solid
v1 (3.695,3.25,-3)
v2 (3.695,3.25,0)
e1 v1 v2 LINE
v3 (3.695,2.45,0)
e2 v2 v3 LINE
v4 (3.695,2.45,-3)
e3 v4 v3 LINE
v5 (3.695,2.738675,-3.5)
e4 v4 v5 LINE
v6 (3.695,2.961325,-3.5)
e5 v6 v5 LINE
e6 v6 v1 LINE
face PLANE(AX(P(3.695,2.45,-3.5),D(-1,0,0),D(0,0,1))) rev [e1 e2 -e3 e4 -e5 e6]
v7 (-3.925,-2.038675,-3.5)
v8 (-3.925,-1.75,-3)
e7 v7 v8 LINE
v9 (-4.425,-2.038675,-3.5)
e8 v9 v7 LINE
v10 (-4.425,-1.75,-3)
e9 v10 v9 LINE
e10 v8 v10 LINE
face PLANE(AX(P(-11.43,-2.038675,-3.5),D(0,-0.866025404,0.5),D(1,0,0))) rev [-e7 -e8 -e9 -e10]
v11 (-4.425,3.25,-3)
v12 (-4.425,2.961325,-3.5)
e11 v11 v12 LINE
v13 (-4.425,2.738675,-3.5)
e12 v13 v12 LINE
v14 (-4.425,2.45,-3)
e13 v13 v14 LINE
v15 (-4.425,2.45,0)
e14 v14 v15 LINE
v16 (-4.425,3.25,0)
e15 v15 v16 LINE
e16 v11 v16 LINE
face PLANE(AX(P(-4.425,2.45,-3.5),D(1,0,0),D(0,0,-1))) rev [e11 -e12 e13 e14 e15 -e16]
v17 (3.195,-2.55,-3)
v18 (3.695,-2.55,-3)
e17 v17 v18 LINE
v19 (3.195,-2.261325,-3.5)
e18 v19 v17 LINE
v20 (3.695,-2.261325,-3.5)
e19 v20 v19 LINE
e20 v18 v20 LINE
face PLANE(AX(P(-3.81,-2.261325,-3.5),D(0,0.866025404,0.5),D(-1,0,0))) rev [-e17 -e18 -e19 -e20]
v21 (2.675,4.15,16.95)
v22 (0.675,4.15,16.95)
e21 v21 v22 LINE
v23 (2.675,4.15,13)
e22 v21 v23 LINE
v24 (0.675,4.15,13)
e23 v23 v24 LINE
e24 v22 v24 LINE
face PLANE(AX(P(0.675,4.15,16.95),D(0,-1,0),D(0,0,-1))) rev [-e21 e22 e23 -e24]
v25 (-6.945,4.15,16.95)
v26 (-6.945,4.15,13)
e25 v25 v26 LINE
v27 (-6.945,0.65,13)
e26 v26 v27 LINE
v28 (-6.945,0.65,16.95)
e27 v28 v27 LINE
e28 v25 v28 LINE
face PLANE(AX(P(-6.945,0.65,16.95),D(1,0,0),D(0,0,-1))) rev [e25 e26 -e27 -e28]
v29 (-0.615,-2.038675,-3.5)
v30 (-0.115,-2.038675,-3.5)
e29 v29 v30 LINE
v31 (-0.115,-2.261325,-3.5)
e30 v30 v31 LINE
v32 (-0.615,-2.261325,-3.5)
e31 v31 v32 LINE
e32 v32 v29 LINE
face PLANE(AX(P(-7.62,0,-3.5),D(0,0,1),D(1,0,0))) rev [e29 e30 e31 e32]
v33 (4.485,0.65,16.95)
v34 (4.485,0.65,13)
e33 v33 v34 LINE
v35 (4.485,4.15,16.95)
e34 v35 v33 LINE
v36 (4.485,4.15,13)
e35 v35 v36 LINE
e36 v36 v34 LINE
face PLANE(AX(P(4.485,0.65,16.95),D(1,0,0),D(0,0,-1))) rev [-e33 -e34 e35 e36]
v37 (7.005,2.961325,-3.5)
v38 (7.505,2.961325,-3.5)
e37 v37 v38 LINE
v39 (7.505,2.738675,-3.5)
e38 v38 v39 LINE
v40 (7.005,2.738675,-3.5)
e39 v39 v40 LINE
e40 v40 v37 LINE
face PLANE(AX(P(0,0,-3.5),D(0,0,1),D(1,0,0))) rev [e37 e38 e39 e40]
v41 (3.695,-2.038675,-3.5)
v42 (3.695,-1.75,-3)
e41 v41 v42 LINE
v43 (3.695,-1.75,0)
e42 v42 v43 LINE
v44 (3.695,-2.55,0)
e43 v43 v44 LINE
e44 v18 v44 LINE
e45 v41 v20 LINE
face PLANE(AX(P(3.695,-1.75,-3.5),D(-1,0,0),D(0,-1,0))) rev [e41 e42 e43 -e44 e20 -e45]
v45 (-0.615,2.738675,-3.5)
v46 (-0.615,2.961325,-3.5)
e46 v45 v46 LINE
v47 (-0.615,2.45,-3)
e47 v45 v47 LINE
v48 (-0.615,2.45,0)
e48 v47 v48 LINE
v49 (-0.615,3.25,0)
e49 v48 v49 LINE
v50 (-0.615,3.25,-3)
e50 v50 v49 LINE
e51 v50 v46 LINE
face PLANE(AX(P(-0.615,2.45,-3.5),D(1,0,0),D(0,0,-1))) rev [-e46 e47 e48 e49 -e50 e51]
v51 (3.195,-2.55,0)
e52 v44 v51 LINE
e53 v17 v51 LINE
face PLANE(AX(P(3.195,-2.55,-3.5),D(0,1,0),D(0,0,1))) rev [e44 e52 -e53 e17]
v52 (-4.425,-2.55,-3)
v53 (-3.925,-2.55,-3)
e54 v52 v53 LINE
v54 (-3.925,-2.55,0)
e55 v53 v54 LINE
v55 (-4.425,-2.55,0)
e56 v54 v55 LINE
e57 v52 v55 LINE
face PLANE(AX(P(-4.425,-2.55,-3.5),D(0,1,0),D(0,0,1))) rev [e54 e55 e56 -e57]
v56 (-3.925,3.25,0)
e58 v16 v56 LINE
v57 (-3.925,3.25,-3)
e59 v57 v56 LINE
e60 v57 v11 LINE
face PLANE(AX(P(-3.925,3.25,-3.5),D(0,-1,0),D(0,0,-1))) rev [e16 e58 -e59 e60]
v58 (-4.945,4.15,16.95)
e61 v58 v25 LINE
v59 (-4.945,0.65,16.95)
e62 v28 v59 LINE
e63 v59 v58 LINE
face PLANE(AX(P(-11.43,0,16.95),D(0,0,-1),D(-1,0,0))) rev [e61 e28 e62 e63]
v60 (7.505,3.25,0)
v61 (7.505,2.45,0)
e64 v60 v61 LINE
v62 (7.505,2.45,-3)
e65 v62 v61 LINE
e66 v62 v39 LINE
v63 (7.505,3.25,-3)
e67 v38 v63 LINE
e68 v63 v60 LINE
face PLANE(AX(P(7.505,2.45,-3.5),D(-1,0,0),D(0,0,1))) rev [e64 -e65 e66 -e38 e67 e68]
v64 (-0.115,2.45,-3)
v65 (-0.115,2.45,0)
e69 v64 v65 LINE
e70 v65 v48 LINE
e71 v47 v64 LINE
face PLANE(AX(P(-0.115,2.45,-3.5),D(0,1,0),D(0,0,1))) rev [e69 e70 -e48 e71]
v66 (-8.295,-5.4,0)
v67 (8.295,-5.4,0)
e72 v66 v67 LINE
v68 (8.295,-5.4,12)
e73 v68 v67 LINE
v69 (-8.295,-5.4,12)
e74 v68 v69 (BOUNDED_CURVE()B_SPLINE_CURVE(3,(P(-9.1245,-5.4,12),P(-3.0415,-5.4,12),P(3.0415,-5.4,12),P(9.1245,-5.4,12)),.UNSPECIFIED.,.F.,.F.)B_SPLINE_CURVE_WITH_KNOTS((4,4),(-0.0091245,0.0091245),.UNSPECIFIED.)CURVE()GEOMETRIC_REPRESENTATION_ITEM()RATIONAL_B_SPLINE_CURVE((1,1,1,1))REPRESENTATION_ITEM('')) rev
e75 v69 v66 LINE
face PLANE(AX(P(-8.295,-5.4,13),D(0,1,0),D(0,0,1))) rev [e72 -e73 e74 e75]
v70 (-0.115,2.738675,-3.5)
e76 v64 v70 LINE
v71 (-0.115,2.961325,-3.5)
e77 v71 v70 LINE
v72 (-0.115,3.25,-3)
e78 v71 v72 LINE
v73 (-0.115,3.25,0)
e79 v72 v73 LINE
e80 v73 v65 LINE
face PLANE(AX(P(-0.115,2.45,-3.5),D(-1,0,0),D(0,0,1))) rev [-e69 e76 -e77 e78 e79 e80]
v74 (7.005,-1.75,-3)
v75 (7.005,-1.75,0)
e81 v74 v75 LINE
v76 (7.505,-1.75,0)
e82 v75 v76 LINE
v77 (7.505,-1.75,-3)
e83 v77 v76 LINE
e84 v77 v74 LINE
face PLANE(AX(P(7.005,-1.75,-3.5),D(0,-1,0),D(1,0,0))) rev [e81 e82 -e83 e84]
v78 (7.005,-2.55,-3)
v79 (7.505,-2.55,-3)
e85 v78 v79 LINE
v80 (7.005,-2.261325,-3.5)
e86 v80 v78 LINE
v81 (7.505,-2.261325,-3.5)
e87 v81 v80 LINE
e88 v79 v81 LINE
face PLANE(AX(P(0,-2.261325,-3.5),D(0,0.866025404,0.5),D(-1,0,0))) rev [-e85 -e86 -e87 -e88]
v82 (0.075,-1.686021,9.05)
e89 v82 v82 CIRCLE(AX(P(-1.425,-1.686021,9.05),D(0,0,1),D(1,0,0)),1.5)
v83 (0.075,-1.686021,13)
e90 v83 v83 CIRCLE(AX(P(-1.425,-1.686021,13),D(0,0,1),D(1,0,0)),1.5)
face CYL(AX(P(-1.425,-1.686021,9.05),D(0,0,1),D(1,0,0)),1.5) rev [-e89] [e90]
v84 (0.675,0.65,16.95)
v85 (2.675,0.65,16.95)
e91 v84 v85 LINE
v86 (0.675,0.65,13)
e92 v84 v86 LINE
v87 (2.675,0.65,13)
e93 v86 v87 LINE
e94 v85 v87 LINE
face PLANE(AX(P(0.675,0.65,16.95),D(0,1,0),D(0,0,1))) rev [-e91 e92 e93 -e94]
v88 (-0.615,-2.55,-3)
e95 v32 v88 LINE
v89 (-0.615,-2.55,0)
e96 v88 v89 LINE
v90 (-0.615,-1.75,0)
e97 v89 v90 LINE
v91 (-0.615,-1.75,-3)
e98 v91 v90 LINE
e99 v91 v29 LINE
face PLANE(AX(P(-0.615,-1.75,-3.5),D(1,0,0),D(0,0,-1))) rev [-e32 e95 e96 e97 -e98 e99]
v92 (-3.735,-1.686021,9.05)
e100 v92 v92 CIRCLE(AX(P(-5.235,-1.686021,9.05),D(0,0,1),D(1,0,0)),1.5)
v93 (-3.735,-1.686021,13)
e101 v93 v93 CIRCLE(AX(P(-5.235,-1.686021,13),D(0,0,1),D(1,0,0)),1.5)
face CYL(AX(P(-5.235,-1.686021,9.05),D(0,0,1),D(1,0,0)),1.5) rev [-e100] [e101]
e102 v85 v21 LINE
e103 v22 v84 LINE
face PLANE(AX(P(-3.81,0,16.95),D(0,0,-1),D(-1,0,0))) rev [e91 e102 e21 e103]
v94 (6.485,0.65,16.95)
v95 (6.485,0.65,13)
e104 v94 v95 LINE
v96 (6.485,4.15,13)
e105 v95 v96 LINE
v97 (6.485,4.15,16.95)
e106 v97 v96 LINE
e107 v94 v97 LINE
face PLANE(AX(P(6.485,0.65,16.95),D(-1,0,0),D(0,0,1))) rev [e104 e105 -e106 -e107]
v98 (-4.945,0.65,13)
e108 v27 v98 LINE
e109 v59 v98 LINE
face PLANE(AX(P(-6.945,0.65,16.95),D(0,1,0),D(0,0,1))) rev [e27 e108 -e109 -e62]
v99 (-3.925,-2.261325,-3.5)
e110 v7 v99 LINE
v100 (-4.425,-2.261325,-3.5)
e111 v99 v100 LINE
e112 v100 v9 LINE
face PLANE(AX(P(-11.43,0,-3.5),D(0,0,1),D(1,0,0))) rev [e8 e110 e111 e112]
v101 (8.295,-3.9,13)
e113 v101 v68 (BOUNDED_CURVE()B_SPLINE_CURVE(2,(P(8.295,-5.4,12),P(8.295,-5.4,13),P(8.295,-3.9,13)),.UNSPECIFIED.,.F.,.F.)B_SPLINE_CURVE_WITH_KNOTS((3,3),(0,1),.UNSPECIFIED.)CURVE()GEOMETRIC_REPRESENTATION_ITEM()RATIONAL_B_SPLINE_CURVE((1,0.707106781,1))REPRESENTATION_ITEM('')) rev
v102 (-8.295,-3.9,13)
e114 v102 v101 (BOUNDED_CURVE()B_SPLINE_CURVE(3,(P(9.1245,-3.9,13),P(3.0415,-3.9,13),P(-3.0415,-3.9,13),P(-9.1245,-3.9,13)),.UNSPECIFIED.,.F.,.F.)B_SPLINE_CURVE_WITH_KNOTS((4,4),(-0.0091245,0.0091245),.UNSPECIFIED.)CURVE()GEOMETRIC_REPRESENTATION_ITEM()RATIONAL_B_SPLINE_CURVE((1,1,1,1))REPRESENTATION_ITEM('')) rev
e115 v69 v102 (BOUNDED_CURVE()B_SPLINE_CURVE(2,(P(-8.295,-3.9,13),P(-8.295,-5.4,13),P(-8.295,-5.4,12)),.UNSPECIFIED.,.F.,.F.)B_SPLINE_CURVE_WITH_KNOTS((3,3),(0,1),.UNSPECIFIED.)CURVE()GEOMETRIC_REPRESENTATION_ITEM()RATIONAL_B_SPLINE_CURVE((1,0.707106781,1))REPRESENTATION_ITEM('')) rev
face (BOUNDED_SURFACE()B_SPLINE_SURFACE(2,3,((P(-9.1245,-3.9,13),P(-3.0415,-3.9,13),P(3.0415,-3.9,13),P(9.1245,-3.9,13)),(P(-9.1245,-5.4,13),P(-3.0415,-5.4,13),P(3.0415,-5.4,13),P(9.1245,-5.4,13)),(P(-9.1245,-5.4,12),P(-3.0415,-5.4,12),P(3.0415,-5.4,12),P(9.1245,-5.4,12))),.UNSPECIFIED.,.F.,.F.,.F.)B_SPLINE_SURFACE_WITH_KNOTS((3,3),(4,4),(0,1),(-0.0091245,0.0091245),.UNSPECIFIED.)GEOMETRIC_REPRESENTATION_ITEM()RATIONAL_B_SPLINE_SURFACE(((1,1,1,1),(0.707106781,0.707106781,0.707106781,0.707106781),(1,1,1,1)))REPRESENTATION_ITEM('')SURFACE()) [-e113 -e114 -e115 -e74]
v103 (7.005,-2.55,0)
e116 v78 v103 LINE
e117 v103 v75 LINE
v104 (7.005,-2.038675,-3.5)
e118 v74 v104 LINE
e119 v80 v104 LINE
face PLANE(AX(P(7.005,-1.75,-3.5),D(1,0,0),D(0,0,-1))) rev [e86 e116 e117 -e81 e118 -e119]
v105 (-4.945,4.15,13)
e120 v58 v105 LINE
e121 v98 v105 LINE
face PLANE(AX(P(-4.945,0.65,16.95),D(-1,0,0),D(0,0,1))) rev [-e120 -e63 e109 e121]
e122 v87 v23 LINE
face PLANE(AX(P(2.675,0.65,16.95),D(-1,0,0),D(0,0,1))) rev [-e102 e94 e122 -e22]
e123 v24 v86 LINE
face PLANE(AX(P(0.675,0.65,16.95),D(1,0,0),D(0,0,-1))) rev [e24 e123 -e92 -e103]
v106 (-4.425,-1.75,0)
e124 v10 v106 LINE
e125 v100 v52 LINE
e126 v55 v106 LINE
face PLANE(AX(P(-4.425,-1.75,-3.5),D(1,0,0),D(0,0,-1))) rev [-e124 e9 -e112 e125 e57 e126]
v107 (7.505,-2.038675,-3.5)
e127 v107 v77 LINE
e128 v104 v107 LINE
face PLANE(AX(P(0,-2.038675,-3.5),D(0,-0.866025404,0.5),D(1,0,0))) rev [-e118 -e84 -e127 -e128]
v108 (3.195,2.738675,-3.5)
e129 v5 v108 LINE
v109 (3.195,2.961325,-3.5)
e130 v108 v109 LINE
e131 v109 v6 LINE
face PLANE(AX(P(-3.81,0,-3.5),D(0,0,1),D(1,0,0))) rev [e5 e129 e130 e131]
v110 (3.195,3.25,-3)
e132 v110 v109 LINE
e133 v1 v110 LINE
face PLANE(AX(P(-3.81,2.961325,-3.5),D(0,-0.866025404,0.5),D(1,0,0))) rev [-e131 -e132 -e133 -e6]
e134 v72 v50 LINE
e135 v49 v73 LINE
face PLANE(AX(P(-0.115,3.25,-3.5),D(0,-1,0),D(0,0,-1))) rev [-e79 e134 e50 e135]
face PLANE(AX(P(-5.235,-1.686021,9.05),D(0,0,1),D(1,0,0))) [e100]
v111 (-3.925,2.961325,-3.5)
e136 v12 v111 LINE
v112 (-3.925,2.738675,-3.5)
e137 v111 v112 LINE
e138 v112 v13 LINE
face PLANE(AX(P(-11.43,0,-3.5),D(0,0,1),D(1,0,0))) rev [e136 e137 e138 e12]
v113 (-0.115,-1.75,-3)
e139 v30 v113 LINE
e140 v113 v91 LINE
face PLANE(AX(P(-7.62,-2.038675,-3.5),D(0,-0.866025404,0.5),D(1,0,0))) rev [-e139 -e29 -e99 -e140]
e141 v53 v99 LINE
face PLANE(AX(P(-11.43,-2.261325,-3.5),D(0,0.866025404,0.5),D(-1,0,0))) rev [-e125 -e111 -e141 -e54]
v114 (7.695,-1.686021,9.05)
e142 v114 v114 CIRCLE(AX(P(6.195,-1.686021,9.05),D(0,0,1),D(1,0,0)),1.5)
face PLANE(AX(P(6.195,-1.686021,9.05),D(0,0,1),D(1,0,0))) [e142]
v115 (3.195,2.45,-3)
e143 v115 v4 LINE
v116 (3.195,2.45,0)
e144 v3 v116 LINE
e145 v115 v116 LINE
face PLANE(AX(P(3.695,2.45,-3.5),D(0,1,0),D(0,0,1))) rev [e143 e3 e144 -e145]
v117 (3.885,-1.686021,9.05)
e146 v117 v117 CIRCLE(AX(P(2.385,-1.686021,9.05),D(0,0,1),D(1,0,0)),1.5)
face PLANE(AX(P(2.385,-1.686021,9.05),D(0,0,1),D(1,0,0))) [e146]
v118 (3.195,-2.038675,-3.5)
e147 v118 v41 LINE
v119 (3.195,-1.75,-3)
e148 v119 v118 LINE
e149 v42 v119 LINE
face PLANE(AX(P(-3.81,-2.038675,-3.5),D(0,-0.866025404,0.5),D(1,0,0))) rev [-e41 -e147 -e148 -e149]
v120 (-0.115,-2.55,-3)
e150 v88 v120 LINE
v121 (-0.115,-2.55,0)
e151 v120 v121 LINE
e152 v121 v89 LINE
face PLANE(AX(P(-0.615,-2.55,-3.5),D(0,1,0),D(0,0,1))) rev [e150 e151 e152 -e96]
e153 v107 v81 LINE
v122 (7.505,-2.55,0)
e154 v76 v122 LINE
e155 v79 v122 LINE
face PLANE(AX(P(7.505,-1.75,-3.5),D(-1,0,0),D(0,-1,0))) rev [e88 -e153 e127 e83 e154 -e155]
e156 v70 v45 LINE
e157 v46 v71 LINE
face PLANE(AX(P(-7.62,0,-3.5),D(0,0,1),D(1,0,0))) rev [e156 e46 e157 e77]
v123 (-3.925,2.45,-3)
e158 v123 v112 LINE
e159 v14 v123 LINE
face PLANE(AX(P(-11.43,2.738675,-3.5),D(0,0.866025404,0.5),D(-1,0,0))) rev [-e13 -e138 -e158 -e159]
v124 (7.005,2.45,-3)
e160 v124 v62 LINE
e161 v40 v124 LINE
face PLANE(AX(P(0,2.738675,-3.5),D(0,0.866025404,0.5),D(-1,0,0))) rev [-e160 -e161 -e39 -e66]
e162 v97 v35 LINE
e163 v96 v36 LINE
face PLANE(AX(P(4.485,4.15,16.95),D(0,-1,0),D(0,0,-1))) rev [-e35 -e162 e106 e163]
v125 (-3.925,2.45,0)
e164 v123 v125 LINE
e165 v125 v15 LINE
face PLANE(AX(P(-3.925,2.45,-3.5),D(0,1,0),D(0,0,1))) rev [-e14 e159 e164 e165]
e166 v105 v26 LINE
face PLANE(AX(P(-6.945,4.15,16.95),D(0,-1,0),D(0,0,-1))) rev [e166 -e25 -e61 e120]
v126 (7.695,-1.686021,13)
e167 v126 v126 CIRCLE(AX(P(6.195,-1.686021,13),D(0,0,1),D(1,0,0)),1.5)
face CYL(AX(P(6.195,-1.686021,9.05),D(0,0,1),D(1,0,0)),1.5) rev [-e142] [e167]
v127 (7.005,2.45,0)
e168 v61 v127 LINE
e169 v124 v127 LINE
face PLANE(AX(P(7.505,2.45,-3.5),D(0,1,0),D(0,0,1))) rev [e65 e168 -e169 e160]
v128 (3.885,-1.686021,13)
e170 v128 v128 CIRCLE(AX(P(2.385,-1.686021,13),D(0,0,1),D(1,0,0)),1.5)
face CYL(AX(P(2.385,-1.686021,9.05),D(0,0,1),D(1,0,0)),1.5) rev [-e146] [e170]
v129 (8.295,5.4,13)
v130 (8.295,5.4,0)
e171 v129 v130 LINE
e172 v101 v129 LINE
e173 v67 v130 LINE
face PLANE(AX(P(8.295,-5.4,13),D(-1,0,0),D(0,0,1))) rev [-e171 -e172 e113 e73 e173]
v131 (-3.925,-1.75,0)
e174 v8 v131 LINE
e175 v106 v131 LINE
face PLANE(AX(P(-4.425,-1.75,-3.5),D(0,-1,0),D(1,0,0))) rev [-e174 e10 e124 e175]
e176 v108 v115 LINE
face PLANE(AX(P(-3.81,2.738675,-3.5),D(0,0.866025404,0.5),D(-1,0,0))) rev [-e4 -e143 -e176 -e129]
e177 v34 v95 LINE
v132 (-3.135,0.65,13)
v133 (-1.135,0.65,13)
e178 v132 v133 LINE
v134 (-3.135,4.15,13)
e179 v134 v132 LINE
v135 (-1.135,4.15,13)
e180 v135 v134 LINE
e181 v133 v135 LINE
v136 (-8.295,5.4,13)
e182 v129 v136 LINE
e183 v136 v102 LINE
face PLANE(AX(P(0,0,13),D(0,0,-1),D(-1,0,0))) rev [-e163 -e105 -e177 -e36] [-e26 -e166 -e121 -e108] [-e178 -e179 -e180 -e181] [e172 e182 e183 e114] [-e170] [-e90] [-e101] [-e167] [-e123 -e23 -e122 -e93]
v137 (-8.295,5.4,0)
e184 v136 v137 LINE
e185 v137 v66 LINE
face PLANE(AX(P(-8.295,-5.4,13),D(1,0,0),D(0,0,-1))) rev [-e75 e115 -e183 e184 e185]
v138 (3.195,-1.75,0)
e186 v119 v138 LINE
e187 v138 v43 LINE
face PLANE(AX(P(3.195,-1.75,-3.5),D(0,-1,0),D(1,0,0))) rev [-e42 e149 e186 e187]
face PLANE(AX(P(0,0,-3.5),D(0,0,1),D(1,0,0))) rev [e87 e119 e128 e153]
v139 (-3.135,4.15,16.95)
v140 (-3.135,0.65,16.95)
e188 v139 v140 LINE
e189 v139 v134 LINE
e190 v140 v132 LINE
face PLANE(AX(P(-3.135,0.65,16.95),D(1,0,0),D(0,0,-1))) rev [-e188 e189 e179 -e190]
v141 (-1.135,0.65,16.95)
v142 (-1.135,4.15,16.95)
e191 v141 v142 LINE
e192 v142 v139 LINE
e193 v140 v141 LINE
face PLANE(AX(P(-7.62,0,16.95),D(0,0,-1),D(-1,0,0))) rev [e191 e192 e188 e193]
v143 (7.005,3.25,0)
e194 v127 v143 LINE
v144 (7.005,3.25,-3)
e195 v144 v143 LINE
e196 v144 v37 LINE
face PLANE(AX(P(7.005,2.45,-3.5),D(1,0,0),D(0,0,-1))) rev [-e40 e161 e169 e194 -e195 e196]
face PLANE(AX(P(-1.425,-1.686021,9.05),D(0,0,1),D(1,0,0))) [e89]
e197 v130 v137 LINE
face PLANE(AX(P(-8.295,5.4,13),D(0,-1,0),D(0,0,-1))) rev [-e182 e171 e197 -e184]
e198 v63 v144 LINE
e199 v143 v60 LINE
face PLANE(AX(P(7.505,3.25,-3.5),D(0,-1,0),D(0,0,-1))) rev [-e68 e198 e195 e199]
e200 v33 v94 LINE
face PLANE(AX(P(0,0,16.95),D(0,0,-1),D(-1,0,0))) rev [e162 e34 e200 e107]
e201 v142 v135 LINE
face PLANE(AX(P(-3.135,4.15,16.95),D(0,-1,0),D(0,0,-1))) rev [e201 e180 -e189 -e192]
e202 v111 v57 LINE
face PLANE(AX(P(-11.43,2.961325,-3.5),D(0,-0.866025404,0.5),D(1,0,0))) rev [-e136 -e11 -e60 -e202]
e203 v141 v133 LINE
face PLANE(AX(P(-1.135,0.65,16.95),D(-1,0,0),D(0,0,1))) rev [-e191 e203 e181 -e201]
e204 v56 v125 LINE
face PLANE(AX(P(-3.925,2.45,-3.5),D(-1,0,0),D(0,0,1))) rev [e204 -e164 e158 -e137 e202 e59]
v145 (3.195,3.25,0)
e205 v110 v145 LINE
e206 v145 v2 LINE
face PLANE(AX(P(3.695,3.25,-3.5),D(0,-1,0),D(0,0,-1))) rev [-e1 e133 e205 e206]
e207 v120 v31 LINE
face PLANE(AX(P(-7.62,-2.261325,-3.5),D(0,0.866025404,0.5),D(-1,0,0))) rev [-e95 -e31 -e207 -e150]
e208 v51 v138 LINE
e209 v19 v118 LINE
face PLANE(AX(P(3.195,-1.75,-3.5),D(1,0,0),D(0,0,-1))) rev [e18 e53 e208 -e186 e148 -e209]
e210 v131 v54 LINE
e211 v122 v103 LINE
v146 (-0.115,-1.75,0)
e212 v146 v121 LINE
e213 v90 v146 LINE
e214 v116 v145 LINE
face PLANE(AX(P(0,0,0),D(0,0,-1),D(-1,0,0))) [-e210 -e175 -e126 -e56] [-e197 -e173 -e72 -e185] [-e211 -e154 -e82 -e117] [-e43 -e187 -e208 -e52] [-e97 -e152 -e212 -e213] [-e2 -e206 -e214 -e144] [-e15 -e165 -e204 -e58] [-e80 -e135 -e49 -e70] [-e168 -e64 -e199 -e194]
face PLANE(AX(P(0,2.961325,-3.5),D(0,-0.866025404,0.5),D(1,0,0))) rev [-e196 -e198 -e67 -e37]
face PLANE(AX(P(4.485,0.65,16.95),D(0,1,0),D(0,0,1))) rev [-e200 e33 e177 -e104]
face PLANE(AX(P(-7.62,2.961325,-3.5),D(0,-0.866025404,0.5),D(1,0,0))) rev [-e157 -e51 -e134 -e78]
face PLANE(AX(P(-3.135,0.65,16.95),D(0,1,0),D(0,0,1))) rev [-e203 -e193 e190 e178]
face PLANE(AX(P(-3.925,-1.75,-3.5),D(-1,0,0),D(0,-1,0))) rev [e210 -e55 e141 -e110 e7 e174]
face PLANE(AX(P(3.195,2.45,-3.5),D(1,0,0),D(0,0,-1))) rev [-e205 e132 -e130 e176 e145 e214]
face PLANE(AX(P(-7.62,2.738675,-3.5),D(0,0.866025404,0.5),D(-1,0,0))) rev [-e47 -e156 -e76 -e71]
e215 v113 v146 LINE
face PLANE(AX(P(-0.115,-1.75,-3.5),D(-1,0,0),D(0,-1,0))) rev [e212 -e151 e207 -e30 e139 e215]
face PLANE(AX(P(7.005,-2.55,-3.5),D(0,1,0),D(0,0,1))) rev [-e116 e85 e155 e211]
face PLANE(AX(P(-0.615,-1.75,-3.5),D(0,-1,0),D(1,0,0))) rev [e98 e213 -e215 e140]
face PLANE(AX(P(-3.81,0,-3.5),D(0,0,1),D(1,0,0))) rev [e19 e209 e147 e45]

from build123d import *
from OCP.BRepFilletAPI import BRepFilletAPI_MakeChamfer

# Parameters (mm, degrees)
SKETCH_1_W                          = 16.59
SKETCH_1_H                          = 10.8
EXTRUDE_1_DEPTH                     = 13
FILLET_1_SIZE                       = 1
FILLET_1_SIZE_2                     = 1.5
SKETCH_2_W                          = 2
SKETCH_2_H                          = 3.5
EXTRUDE_2_DEPTH                     = 3.95
SKETCH_3_R                          = 1.5
CUT_EXTRUDE_1_DEPTH                 = 3.95
SKETCH_4_W                          = 0.5
SKETCH_4_H                          = 0.8
EXTRUDE_3_DEPTH                     = 3.5
CHAMFER_1_SIZE                      = 0.5
CHAMFER_1_SIZE2                     = 0.288675135
PATTERN_LINEAR_2_COUNT              = 4
PATTERN_LINEAR_2_PITCH              = 3.81
CHAMFER_1_OF_PATTERN_LINEAR_2_SIZE  = 0.5
CHAMFER_1_OF_PATTERN_LINEAR_2_SIZE2 = 0.288675135


with BuildPart() as part:
    # Эскиз1 → Бобышка-Вытянуть1 (new body)
    with BuildSketch(Plane.XY):
        Rectangle(SKETCH_1_W, SKETCH_1_H)
    extrude(amount=EXTRUDE_1_DEPTH)

    # Скругление1
    # an asymmetric fillet: 1.5, 1 mm, written as the material it takes off along each edge
    with BuildSketch(Plane(origin=(-12.045, -5.4, 13), x_dir=(0, 0, -1), z_dir=(1, 0, 0))) as fillet_1_piece_1:
        with BuildLine():
            Bezier((FILLET_1_SIZE, 0), (0, 0), (0, FILLET_1_SIZE_2), weights=[1, 0.707106781, 1])
            Line((0, FILLET_1_SIZE_2), (0, 0))
            Line((0, 0), (FILLET_1_SIZE, 0))
        make_face()
    extrude(amount=24.09, mode=Mode.SUBTRACT)

    # Эскиз2 → Бобышка-Вытянуть2 (add)
    with BuildSketch(Plane.XY.offset(13)):
        with Locations((5.485, 2.4)):
            Rectangle(SKETCH_2_W, SKETCH_2_H)
    extrude_2 = extrude(amount=EXTRUDE_2_DEPTH)

    # Эскиз3 → Вырез-Вытянуть1 (cut)
    with BuildSketch(Plane.XY.offset(13)):
        with Locations((6.195, -1.686021073)):
            Circle(SKETCH_3_R)
    cut_extrude_1 = extrude(amount=-CUT_EXTRUDE_1_DEPTH, mode=Mode.SUBTRACT)

    # Эскиз4 → Бобышка-Вытянуть3 (add)
    with BuildSketch(Plane(origin=(0, 0, 0), x_dir=(-1, 0, 0), z_dir=(0, 0, -1))):
        with Locations((-7.255, 2.85)):
            Rectangle(SKETCH_4_W, SKETCH_4_H)
        with Locations((-7.255, -2.15)):
            Rectangle(SKETCH_4_W, SKETCH_4_H)
    extrude_3 = extrude(amount=EXTRUDE_3_DEPTH)

    # Фаска1: one chamfer whose edges measure the first distance from different faces: ONE call of the kernel's chamfer builder (chamfer() names one face for all edges)
    chamfer_1_edges_1 = [part.edges().sort_by_distance(p)[0] for p in [
        (7.255, 3.25, -3.5),
    ]]
    chamfer_1_side_1 = [part.faces().sort_by_distance(p)[0] for p in [
        (7.255, 3.25, -1.75),
    ]]
    chamfer_1_edges_2 = [part.edges().sort_by_distance(p)[0] for p in [
        (7.255, 2.45, -3.5),
    ]]
    chamfer_1_side_2 = [part.faces().sort_by_distance(p)[0] for p in [
        (7.255, 2.45, -1.75),
    ]]
    chamfer_1_edges_3 = [part.edges().sort_by_distance(p)[0] for p in [
        (7.255, -2.55, -3.5),
    ]]
    chamfer_1_side_3 = [part.faces().sort_by_distance(p)[0] for p in [
        (7.255, -2.55, -1.75),
    ]]
    chamfer_1_edges_4 = [part.edges().sort_by_distance(p)[0] for p in [
        (7.255, -1.75, -3.5),
    ]]
    chamfer_1_side_4 = [part.faces().sort_by_distance(p)[0] for p in [
        (7.255, -1.75, -1.75),
    ]]
    chamfer_1 = BRepFilletAPI_MakeChamfer(part.part.solid().wrapped)
    for e in chamfer_1_edges_1:
        chamfer_1.Add(CHAMFER_1_SIZE, CHAMFER_1_SIZE2, e.wrapped, chamfer_1_side_1[0].wrapped)  # the first distance lies on this face
    for e in chamfer_1_edges_2:
        chamfer_1.Add(CHAMFER_1_SIZE, CHAMFER_1_SIZE2, e.wrapped, chamfer_1_side_2[0].wrapped)  # the first distance lies on this face
    for e in chamfer_1_edges_3:
        chamfer_1.Add(CHAMFER_1_SIZE, CHAMFER_1_SIZE2, e.wrapped, chamfer_1_side_3[0].wrapped)  # the first distance lies on this face
    for e in chamfer_1_edges_4:
        chamfer_1.Add(CHAMFER_1_SIZE, CHAMFER_1_SIZE2, e.wrapped, chamfer_1_side_4[0].wrapped)  # the first distance lies on this face
    add(Compound.cast(chamfer_1.Shape()), mode=Mode.REPLACE)

    # Линейный массив2: Бобышка-Вытянуть2, Вырез-Вытянуть1, Бобышка-Вытянуть3 ×4
    with Locations(*[(-i * PATTERN_LINEAR_2_PITCH, 0, 0) for i in range(1, PATTERN_LINEAR_2_COUNT)]):
        add(extrude_2)
        add(cut_extrude_1, mode=Mode.SUBTRACT)
        add(extrude_3)

    # Фаска1 of Линейный массив2: one chamfer whose edges measure the first distance from different faces: ONE call of the kernel's chamfer builder (chamfer() names one face for all edges)
    chamfer_1_of_pattern_linear_2_edges_1 = [part.edges().sort_by_distance(p)[0] for p in [
        (3.445, 3.25, -3.5),
    ]]
    chamfer_1_of_pattern_linear_2_side_1 = [part.faces().sort_by_distance(p)[0] for p in [
        (3.445, 3.25, -1.75),
    ]]
    chamfer_1_of_pattern_linear_2_edges_2 = [part.edges().sort_by_distance(p)[0] for p in [
        (3.445, 2.45, -3.5),
    ]]
    chamfer_1_of_pattern_linear_2_side_2 = [part.faces().sort_by_distance(p)[0] for p in [
        (3.445, 2.45, -1.75),
    ]]
    chamfer_1_of_pattern_linear_2_edges_3 = [part.edges().sort_by_distance(p)[0] for p in [
        (3.445, -2.55, -3.5),
    ]]
    chamfer_1_of_pattern_linear_2_side_3 = [part.faces().sort_by_distance(p)[0] for p in [
        (3.445, -2.55, -1.75),
    ]]
    chamfer_1_of_pattern_linear_2_edges_4 = [part.edges().sort_by_distance(p)[0] for p in [
        (3.445, -1.75, -3.5),
    ]]
    chamfer_1_of_pattern_linear_2_side_4 = [part.faces().sort_by_distance(p)[0] for p in [
        (3.445, -1.75, -1.75),
    ]]
    chamfer_1_of_pattern_linear_2_edges_5 = [part.edges().sort_by_distance(p)[0] for p in [
        (-0.365, 3.25, -3.5),
    ]]
    chamfer_1_of_pattern_linear_2_side_5 = [part.faces().sort_by_distance(p)[0] for p in [
        (-0.365, 3.25, -1.75),
    ]]
    chamfer_1_of_pattern_linear_2_edges_6 = [part.edges().sort_by_distance(p)[0] for p in [
        (-0.365, 2.45, -3.5),
    ]]
    chamfer_1_of_pattern_linear_2_side_6 = [part.faces().sort_by_distance(p)[0] for p in [
        (-0.365, 2.45, -1.75),
    ]]
    chamfer_1_of_pattern_linear_2_edges_7 = [part.edges().sort_by_distance(p)[0] for p in [
        (-0.365, -2.55, -3.5),
    ]]
    chamfer_1_of_pattern_linear_2_side_7 = [part.faces().sort_by_distance(p)[0] for p in [
        (-0.365, -2.55, -1.75),
    ]]
    chamfer_1_of_pattern_linear_2_edges_8 = [part.edges().sort_by_distance(p)[0] for p in [
        (-0.365, -1.75, -3.5),
    ]]
    chamfer_1_of_pattern_linear_2_side_8 = [part.faces().sort_by_distance(p)[0] for p in [
        (-0.365, -1.75, -1.75),
    ]]
    chamfer_1_of_pattern_linear_2_edges_9 = [part.edges().sort_by_distance(p)[0] for p in [
        (-4.175, 3.25, -3.5),
    ]]
    chamfer_1_of_pattern_linear_2_side_9 = [part.faces().sort_by_distance(p)[0] for p in [
        (-4.175, 3.25, -1.75),
    ]]
    chamfer_1_of_pattern_linear_2_edges_10 = [part.edges().sort_by_distance(p)[0] for p in [
        (-4.175, 2.45, -3.5),
    ]]
    chamfer_1_of_pattern_linear_2_side_10 = [part.faces().sort_by_distance(p)[0] for p in [
        (-4.175, 2.45, -1.75),
    ]]
    chamfer_1_of_pattern_linear_2_edges_11 = [part.edges().sort_by_distance(p)[0] for p in [
        (-4.175, -2.55, -3.5),
    ]]
    chamfer_1_of_pattern_linear_2_side_11 = [part.faces().sort_by_distance(p)[0] for p in [
        (-4.175, -2.55, -1.75),
    ]]
    chamfer_1_of_pattern_linear_2_edges_12 = [part.edges().sort_by_distance(p)[0] for p in [
        (-4.175, -1.75, -3.5),
    ]]
    chamfer_1_of_pattern_linear_2_side_12 = [part.faces().sort_by_distance(p)[0] for p in [
        (-4.175, -1.75, -1.75),
    ]]
    chamfer_1_of_pattern_linear_2 = BRepFilletAPI_MakeChamfer(part.part.solid().wrapped)
    for e in chamfer_1_of_pattern_linear_2_edges_1:
        chamfer_1_of_pattern_linear_2.Add(CHAMFER_1_OF_PATTERN_LINEAR_2_SIZE, CHAMFER_1_OF_PATTERN_LINEAR_2_SIZE2, e.wrapped, chamfer_1_of_pattern_linear_2_side_1[0].wrapped)  # the first distance lies on this face
    for e in chamfer_1_of_pattern_linear_2_edges_2:
        chamfer_1_of_pattern_linear_2.Add(CHAMFER_1_OF_PATTERN_LINEAR_2_SIZE, CHAMFER_1_OF_PATTERN_LINEAR_2_SIZE2, e.wrapped, chamfer_1_of_pattern_linear_2_side_2[0].wrapped)  # the first distance lies on this face
    for e in chamfer_1_of_pattern_linear_2_edges_3:
        chamfer_1_of_pattern_linear_2.Add(CHAMFER_1_OF_PATTERN_LINEAR_2_SIZE, CHAMFER_1_OF_PATTERN_LINEAR_2_SIZE2, e.wrapped, chamfer_1_of_pattern_linear_2_side_3[0].wrapped)  # the first distance lies on this face
    for e in chamfer_1_of_pattern_linear_2_edges_4:
        chamfer_1_of_pattern_linear_2.Add(CHAMFER_1_OF_PATTERN_LINEAR_2_SIZE, CHAMFER_1_OF_PATTERN_LINEAR_2_SIZE2, e.wrapped, chamfer_1_of_pattern_linear_2_side_4[0].wrapped)  # the first distance lies on this face
    for e in chamfer_1_of_pattern_linear_2_edges_5:
        chamfer_1_of_pattern_linear_2.Add(CHAMFER_1_OF_PATTERN_LINEAR_2_SIZE, CHAMFER_1_OF_PATTERN_LINEAR_2_SIZE2, e.wrapped, chamfer_1_of_pattern_linear_2_side_5[0].wrapped)  # the first distance lies on this face
    for e in chamfer_1_of_pattern_linear_2_edges_6:
        chamfer_1_of_pattern_linear_2.Add(CHAMFER_1_OF_PATTERN_LINEAR_2_SIZE, CHAMFER_1_OF_PATTERN_LINEAR_2_SIZE2, e.wrapped, chamfer_1_of_pattern_linear_2_side_6[0].wrapped)  # the first distance lies on this face
    for e in chamfer_1_of_pattern_linear_2_edges_7:
        chamfer_1_of_pattern_linear_2.Add(CHAMFER_1_OF_PATTERN_LINEAR_2_SIZE, CHAMFER_1_OF_PATTERN_LINEAR_2_SIZE2, e.wrapped, chamfer_1_of_pattern_linear_2_side_7[0].wrapped)  # the first distance lies on this face
    for e in chamfer_1_of_pattern_linear_2_edges_8:
        chamfer_1_of_pattern_linear_2.Add(CHAMFER_1_OF_PATTERN_LINEAR_2_SIZE, CHAMFER_1_OF_PATTERN_LINEAR_2_SIZE2, e.wrapped, chamfer_1_of_pattern_linear_2_side_8[0].wrapped)  # the first distance lies on this face
    for e in chamfer_1_of_pattern_linear_2_edges_9:
        chamfer_1_of_pattern_linear_2.Add(CHAMFER_1_OF_PATTERN_LINEAR_2_SIZE, CHAMFER_1_OF_PATTERN_LINEAR_2_SIZE2, e.wrapped, chamfer_1_of_pattern_linear_2_side_9[0].wrapped)  # the first distance lies on this face
    for e in chamfer_1_of_pattern_linear_2_edges_10:
        chamfer_1_of_pattern_linear_2.Add(CHAMFER_1_OF_PATTERN_LINEAR_2_SIZE, CHAMFER_1_OF_PATTERN_LINEAR_2_SIZE2, e.wrapped, chamfer_1_of_pattern_linear_2_side_10[0].wrapped)  # the first distance lies on this face
    for e in chamfer_1_of_pattern_linear_2_edges_11:
        chamfer_1_of_pattern_linear_2.Add(CHAMFER_1_OF_PATTERN_LINEAR_2_SIZE, CHAMFER_1_OF_PATTERN_LINEAR_2_SIZE2, e.wrapped, chamfer_1_of_pattern_linear_2_side_11[0].wrapped)  # the first distance lies on this face
    for e in chamfer_1_of_pattern_linear_2_edges_12:
        chamfer_1_of_pattern_linear_2.Add(CHAMFER_1_OF_PATTERN_LINEAR_2_SIZE, CHAMFER_1_OF_PATTERN_LINEAR_2_SIZE2, e.wrapped, chamfer_1_of_pattern_linear_2_side_12[0].wrapped)  # the first distance lies on this face
    add(Compound.cast(chamfer_1_of_pattern_linear_2.Shape()), mode=Mode.REPLACE)


solid = part.part
